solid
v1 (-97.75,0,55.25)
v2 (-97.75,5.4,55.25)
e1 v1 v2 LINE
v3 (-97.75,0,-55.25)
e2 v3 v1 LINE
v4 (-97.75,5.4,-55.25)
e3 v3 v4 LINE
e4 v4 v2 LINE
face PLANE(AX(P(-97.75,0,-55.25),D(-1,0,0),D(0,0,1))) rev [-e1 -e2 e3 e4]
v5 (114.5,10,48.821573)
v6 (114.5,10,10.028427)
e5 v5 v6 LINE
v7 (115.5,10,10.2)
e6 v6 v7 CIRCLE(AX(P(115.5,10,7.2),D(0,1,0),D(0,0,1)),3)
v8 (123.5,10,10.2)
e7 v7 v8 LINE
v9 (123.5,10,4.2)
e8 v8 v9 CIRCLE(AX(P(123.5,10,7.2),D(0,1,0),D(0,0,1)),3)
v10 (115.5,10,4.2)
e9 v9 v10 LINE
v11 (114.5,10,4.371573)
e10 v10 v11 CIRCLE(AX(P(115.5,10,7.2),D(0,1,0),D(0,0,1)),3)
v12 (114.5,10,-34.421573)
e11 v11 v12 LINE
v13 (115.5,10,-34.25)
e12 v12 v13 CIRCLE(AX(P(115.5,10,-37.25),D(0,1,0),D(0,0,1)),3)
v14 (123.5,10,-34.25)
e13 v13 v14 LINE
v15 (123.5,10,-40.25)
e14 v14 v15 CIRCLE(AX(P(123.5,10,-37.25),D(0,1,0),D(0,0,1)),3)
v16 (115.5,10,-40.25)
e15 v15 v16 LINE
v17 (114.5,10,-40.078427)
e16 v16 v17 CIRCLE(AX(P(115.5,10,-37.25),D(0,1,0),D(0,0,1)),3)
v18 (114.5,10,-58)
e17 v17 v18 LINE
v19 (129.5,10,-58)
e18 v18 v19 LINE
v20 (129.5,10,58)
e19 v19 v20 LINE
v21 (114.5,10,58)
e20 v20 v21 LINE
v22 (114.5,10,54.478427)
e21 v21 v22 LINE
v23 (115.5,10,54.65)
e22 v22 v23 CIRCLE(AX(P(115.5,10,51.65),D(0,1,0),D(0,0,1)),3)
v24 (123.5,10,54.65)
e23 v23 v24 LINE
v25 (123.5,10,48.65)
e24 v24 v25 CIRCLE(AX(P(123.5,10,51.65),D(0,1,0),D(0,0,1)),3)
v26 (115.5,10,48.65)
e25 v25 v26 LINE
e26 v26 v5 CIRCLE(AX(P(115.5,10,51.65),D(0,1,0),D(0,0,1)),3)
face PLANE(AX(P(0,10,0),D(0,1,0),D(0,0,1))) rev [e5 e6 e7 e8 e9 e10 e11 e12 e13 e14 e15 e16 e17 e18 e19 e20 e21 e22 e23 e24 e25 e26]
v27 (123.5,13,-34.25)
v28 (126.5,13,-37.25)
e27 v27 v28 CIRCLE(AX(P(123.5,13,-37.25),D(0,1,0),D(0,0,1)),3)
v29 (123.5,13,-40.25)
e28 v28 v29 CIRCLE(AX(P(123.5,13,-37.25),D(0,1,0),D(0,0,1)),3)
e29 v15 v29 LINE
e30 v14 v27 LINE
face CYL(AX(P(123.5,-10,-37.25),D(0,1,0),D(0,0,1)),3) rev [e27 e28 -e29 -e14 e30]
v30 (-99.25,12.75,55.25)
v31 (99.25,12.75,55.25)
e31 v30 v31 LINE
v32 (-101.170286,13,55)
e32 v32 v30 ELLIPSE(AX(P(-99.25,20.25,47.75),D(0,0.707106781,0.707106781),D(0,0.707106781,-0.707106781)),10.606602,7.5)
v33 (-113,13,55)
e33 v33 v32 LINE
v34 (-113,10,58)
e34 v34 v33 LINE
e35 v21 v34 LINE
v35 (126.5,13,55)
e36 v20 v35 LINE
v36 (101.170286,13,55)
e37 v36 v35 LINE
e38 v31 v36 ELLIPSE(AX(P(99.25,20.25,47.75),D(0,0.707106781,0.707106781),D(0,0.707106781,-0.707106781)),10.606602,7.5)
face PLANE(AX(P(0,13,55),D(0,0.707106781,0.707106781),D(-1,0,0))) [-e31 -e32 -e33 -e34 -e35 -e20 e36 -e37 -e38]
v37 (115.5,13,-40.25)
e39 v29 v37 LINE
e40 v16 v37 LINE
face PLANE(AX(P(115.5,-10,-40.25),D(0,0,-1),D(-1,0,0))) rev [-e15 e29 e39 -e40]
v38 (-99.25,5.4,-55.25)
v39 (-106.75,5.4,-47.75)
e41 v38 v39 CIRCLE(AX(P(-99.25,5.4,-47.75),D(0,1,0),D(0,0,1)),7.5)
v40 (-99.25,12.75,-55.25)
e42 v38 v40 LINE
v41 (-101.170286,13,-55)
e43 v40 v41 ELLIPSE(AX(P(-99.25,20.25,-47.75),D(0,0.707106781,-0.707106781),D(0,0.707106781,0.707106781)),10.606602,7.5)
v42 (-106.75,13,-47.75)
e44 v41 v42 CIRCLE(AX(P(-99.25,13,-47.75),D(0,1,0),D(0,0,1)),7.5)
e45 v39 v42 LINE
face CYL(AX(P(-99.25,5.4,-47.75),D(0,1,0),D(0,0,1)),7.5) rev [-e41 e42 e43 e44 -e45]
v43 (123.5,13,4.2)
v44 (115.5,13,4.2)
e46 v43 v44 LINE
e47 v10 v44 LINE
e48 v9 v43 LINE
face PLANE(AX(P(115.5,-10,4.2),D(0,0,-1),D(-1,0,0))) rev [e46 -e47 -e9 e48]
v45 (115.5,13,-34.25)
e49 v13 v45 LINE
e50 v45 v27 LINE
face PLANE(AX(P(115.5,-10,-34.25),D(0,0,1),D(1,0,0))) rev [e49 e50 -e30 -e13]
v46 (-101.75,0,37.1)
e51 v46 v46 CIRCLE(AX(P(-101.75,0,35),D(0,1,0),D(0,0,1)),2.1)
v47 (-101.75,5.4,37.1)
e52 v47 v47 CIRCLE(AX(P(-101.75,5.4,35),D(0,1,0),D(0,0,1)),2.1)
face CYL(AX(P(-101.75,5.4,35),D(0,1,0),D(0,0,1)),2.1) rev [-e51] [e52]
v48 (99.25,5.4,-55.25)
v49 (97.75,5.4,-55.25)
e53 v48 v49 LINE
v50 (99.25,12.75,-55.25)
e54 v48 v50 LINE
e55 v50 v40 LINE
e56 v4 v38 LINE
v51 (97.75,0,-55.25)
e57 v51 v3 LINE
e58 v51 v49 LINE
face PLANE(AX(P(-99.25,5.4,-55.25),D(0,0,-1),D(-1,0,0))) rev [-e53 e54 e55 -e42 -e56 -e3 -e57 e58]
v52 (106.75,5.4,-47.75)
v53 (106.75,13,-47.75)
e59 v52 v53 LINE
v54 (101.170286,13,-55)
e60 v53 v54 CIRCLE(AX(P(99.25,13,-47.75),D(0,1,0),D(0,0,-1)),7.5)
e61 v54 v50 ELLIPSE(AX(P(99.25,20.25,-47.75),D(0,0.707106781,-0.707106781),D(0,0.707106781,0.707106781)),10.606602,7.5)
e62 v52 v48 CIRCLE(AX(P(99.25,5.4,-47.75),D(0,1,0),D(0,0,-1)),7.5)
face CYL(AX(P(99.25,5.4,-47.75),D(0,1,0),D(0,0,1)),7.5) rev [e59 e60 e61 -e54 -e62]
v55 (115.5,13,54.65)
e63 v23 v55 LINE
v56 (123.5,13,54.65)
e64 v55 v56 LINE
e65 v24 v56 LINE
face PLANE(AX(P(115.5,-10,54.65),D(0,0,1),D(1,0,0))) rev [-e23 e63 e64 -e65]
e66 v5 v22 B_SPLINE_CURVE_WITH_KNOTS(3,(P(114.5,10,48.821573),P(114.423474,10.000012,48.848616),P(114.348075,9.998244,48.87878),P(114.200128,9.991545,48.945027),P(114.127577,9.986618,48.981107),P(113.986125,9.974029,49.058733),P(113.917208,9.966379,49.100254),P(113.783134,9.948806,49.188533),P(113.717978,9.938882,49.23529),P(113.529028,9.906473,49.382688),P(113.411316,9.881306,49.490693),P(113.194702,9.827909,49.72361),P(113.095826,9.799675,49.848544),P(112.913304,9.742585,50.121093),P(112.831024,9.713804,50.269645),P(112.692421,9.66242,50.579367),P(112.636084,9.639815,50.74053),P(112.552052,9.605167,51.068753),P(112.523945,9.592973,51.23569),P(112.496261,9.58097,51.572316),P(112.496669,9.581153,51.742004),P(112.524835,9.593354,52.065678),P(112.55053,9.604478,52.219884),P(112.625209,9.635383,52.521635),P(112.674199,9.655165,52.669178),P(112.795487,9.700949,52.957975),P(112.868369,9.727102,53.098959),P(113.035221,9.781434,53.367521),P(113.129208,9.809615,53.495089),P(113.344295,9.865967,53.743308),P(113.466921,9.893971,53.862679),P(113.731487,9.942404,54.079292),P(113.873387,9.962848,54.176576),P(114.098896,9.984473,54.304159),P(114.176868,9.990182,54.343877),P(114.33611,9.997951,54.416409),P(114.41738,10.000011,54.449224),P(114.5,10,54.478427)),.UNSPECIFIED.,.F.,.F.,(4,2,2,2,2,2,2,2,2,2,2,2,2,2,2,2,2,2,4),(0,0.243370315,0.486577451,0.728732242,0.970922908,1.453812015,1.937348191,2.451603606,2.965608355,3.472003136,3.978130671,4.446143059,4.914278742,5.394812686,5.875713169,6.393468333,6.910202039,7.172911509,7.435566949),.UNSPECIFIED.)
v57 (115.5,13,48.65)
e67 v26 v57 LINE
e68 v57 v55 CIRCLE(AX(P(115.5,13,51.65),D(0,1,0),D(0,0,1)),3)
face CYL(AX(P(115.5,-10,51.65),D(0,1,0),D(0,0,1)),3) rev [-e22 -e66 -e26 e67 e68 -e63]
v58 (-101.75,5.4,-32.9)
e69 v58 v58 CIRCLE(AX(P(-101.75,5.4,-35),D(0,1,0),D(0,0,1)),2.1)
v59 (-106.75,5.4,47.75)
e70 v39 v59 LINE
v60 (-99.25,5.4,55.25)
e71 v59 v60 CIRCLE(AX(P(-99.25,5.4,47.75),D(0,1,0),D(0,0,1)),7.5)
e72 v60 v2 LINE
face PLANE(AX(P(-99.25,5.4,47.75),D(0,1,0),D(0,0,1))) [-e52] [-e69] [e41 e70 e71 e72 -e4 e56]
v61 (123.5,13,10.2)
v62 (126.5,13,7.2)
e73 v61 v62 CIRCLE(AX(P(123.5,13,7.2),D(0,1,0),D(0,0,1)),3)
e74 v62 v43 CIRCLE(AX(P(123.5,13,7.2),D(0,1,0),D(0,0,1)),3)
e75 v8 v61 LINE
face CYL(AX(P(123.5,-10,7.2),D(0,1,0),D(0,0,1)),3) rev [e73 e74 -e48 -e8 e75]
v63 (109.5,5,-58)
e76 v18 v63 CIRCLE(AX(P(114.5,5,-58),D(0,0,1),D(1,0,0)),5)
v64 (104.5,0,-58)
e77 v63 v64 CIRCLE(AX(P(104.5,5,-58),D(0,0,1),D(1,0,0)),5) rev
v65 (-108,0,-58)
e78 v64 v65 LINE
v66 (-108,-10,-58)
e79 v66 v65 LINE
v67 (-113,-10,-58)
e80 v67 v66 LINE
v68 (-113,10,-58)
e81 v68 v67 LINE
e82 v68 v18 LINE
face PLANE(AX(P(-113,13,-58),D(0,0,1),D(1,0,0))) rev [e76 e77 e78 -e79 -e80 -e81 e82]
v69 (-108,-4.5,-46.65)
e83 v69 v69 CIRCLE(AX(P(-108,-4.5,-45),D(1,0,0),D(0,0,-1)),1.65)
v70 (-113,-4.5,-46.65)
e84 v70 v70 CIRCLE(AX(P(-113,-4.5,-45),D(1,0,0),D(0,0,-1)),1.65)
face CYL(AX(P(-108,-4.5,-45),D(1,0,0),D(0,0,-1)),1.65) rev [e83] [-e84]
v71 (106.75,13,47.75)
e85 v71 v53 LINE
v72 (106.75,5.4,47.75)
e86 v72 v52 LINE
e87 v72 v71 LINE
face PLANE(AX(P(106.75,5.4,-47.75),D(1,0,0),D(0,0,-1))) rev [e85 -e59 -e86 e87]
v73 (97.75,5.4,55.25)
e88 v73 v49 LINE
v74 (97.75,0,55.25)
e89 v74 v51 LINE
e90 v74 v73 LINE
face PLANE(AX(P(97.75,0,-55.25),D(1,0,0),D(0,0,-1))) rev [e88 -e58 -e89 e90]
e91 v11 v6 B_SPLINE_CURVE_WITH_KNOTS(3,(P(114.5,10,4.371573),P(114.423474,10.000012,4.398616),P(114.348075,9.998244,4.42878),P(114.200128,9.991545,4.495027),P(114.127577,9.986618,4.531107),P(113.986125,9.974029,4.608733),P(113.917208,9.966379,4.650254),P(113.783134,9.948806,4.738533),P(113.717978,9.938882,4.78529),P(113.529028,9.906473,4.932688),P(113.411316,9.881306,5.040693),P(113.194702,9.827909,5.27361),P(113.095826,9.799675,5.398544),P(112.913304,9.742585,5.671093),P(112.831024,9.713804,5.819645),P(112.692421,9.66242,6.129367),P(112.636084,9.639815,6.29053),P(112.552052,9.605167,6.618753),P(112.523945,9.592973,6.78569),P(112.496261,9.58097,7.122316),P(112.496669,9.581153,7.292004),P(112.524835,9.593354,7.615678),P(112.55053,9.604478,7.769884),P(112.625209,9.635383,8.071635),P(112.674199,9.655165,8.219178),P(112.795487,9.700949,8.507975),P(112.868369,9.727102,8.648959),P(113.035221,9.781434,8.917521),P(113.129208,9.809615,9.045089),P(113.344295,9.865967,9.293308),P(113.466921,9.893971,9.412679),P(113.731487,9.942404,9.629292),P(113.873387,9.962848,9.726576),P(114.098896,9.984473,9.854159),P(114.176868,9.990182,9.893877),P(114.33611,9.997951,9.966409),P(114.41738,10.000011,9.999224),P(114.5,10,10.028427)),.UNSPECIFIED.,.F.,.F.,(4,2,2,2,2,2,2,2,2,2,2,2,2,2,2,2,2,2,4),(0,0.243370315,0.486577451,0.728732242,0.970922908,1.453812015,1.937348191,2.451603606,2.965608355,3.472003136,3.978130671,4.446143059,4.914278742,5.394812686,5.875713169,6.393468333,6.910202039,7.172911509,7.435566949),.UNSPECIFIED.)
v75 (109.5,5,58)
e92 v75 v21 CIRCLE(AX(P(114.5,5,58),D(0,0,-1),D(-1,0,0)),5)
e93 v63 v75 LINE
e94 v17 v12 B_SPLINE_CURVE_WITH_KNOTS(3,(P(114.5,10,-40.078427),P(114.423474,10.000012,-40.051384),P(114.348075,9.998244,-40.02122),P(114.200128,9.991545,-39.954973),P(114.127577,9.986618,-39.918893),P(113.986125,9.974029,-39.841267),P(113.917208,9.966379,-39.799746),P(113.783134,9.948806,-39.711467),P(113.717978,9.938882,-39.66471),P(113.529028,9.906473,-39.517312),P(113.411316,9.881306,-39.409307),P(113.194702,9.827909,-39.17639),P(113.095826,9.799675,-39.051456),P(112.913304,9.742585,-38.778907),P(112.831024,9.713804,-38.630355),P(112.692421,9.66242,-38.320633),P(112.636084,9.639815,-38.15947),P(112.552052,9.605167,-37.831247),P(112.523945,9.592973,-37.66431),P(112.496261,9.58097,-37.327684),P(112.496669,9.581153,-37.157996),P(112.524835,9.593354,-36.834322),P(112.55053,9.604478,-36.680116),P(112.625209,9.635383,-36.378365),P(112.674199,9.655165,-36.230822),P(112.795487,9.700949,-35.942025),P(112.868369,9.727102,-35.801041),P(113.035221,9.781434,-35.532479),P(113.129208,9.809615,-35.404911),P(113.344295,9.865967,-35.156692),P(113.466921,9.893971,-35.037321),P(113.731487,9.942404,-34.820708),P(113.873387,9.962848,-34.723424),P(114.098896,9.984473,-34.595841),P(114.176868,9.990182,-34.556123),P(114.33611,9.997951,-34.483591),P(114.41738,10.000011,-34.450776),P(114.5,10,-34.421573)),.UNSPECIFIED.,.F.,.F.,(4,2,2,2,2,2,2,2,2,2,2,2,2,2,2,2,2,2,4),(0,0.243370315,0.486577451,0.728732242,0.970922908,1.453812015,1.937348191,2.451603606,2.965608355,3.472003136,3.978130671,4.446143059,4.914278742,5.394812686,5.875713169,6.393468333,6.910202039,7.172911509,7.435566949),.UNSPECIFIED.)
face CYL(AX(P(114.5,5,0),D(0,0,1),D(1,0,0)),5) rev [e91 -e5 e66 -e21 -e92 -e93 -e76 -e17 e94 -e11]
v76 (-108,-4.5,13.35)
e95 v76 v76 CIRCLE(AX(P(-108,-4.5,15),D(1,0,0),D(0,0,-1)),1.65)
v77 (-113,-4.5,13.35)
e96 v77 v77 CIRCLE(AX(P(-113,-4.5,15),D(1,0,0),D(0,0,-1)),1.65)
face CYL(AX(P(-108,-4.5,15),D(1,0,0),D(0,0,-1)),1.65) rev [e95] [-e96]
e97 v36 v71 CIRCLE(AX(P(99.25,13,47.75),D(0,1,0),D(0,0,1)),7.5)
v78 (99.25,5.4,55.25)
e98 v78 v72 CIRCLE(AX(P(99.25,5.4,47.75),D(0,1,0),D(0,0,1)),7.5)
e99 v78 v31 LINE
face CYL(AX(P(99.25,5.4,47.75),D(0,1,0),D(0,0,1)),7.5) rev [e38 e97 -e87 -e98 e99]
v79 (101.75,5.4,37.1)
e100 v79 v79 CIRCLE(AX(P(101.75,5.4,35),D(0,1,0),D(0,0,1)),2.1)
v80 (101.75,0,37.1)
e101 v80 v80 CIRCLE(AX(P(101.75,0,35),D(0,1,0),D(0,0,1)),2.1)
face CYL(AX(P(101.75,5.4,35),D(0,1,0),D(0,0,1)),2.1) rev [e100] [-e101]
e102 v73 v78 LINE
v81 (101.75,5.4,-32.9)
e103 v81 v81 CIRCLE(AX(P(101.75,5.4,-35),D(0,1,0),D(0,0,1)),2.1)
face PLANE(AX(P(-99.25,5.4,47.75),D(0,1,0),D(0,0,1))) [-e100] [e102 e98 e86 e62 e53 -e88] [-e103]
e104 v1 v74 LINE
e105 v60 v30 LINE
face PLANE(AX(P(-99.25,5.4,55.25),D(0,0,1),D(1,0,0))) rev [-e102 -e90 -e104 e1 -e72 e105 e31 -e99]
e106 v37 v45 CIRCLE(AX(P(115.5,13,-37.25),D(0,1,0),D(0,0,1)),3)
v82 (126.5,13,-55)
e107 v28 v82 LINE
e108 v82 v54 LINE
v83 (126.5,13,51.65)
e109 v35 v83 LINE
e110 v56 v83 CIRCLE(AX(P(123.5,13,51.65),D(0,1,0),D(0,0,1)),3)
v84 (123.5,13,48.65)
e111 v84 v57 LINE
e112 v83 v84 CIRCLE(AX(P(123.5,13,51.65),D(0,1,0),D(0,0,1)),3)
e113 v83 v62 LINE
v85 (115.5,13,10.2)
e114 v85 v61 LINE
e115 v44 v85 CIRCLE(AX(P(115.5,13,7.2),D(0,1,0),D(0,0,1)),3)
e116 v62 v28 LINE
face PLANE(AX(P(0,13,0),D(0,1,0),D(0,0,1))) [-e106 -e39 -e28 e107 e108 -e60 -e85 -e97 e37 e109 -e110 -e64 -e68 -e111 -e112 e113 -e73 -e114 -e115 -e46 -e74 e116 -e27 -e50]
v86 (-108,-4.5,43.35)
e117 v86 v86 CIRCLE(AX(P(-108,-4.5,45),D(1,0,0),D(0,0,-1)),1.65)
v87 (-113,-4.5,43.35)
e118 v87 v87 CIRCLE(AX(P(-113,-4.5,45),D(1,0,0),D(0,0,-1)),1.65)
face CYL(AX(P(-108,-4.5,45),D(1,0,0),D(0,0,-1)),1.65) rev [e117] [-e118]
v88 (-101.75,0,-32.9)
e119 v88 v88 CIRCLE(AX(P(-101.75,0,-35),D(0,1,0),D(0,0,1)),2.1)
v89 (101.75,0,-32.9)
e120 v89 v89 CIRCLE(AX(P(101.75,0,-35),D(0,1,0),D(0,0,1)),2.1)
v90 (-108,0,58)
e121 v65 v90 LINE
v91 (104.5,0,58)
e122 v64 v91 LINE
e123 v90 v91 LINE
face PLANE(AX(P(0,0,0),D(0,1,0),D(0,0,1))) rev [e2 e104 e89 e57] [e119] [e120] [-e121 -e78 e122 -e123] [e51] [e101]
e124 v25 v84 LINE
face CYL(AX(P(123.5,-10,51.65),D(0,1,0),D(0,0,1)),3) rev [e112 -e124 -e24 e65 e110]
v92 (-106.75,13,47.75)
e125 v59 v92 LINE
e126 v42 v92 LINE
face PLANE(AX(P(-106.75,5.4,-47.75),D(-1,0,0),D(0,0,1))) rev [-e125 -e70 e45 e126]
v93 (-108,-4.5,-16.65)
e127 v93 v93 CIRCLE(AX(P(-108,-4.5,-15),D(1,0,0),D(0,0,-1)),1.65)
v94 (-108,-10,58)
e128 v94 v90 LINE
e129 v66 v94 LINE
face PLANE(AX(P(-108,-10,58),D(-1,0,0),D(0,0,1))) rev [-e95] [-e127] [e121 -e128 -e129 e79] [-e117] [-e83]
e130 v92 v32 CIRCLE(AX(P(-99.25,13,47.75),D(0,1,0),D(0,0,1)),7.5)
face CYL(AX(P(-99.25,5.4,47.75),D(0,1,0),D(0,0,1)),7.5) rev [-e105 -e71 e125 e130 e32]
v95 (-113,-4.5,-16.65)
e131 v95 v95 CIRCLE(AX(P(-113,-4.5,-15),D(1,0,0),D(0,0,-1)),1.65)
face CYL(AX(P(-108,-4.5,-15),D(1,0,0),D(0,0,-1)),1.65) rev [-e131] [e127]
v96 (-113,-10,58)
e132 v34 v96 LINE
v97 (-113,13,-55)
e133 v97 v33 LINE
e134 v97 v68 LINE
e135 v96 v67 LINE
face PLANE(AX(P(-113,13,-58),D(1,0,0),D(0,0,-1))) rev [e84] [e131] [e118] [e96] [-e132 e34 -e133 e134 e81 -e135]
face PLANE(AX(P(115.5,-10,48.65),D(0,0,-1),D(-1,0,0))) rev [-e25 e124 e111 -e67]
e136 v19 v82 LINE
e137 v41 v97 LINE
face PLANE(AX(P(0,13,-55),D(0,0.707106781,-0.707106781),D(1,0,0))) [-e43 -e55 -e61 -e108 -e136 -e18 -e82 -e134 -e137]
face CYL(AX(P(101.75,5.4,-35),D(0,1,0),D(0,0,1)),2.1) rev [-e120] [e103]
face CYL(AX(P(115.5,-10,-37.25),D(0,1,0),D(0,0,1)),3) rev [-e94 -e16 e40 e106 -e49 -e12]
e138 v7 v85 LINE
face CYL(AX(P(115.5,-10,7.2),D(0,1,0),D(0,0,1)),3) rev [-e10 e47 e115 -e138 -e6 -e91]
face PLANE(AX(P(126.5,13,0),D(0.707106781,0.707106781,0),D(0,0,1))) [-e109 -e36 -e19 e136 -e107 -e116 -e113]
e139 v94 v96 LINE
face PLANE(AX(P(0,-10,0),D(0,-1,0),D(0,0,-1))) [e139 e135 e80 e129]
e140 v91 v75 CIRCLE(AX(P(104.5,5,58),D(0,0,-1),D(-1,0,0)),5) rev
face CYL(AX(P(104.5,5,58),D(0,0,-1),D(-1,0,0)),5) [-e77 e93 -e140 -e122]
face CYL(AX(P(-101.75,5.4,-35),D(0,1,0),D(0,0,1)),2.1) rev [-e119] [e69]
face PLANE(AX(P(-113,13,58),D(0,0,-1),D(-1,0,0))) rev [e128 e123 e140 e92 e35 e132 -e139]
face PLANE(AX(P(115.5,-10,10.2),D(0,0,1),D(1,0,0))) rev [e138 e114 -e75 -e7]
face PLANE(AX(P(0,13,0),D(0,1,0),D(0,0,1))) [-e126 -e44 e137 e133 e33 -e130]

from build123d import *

# Parameters (mm, degrees)
SKETCH1_W                        = 242.5
SKETCH1_H                        = 116
BOSS_EXTRUDE1_DEPTH              = 13
CUT_EXTRUDE1_DEPTH               = 7.6
F_1_8_27_NPSM_TAPPED_HOLE1_D     = 5
F_1_8_27_NPSM_TAPPED_HOLE1_DEPTH = 22.99
F_1_8_27_NPSM_TAPPED_HOLE1_TIP   = 1.502151548
SKETCH6_W                        = 195.5
SKETCH6_H                        = 110.5
CUT_EXTRUDE2_DEPTH               = 143.098592533
SKETCH32_W                       = 20
SKETCH32_H                       = 116
CUT_EXTRUDE10_DEPTH              = 10
FILLET1_START                    = -59
FILLET1_DEPTH                    = 118
FILLET1_START_2                  = -58
FILLET1_2_DEPTH                  = 116
CHAMFER1_SIZE                    = 3
SKETCH36_W                       = 5
SKETCH36_H                       = 116
BOSS_EXTRUDE2_DEPTH              = 10
M5X0_8_TAPPED_HOLE1_D            = 4.2
M5X0_8_TAPPED_HOLE1_DEPTH        = 12.4
M5X0_8_TAPPED_HOLE1_TIP          = 1.2618073
M4X0_7_TAPPED_HOLE1_D            = 3.3
CUT_EXTRUDE11_DEPTH              = 144.747173885


with BuildPart() as part:
    # Sketch1 → Boss-Extrude1 (new body)
    with BuildSketch(Plane(origin=(0, 0, 0), x_dir=(1, 0, 0), z_dir=(0, 1, 0))):
        with Locations((8.25, 0)):
            Rectangle(SKETCH1_W, SKETCH1_H)
    extrude(amount=BOSS_EXTRUDE1_DEPTH)

    # Sketch2 → Cut-Extrude1 (cut)
    with BuildSketch(Plane(origin=(0, 13, 0), x_dir=(1, 0, 0), z_dir=(0, 1, 0))):
        with BuildLine():
            Line((-99.25, 55.25), (99.25, 55.25))
            ThreePointArc((99.25, 55.25), (104.553300859, 53.053300859), (106.75, 47.75))
            Line((106.75, 47.75), (106.75, -47.75))
            ThreePointArc((106.75, -47.75), (104.553300859, -53.053300859), (99.25, -55.25))
            Line((99.25, -55.25), (-99.25, -55.25))
            ThreePointArc((-99.25, -55.25), (-104.553300859, -53.053300859), (-106.75, -47.75))
            Line((-106.75, -47.75), (-106.75, 47.75))
            ThreePointArc((-106.75, 47.75), (-104.553300859, 53.053300859), (-99.25, 55.25))
        make_face()
    extrude(amount=-CUT_EXTRUDE1_DEPTH, mode=Mode.SUBTRACT)

    # 1/8-27 NPSM Tapped Hole1
    with Locations(Plane(origin=(0, 5.4, 0), x_dir=(1, 0, 0), z_dir=(0, 1, 0))):
        with Locations((-74.86, 30.93), (51.34, 30.93), (51.34, -34.72), (-74.86, -34.72)):
            Hole(F_1_8_27_NPSM_TAPPED_HOLE1_D / 2, depth=F_1_8_27_NPSM_TAPPED_HOLE1_DEPTH)
            with Locations((0, 0, -(F_1_8_27_NPSM_TAPPED_HOLE1_DEPTH + F_1_8_27_NPSM_TAPPED_HOLE1_TIP / 2))):  # 118° drill point
                Cone(0, F_1_8_27_NPSM_TAPPED_HOLE1_D / 2, F_1_8_27_NPSM_TAPPED_HOLE1_TIP, mode=Mode.SUBTRACT)

    # Sketch6 → Cut-Extrude2 (cut, through all)
    with BuildSketch(Plane(origin=(0, 5.4, 0), x_dir=(1, 0, 0), z_dir=(0, 1, 0))):
        Rectangle(SKETCH6_W, SKETCH6_H)
    extrude(amount=-CUT_EXTRUDE2_DEPTH, mode=Mode.SUBTRACT)

    # Sketch32 → Cut-Extrude10 (cut)
    with BuildSketch(Plane.XZ):
        with Locations((119.5, 0)):
            Rectangle(SKETCH32_W, SKETCH32_H)
    extrude(amount=-CUT_EXTRUDE10_DEPTH, mode=Mode.SUBTRACT)

    # Fillet1: read off the stored shape, not the designer's step
    # Fillet1 outline → Fillet1 (cut)
    with BuildSketch(Plane.XY.offset(FILLET1_START)):
        with BuildLine():
            Line((109.5, 0), (109.5, 5))
            ThreePointArc((109.5, 5), (108.035533906, 1.464466094), (104.5, 0))
            Line((104.5, 0), (109.5, 0))
        make_face()
    extrude(amount=FILLET1_DEPTH, mode=Mode.SUBTRACT)

    # Fillet1 2 outline → Fillet1 2 (add)
    with BuildSketch(Plane.XY.offset(FILLET1_START_2)):
        with BuildLine():
            ThreePointArc((109.5, 5), (110.964466094, 8.535533906), (114.5, 10))
            Line((114.5, 10), (109.5, 10))
            Line((109.5, 10), (109.5, 5))
        make_face()
    extrude(amount=FILLET1_2_DEPTH)

    # Chamfer1
    # the kernel refuses this chamfer: 3 mm, written as the material it takes off along each edge
    with BuildSketch(Plane(origin=(137.215048964, 13, 58), x_dir=(0, 0, -1), z_dir=(-1, 0, 0))) as chamfer1_piece_1:
        Polygon((CHAMFER1_SIZE, 0), (0, CHAMFER1_SIZE), (0, 0), align=None)
    extrude(amount=257.930097928, mode=Mode.SUBTRACT)
    with BuildSketch(Plane(origin=(129.5, 13, -65.715048964), x_dir=(0, -1, 0), z_dir=(0, 0, 1))) as chamfer1_piece_2:
        Polygon((CHAMFER1_SIZE, 0), (0, -CHAMFER1_SIZE), (0, 0), align=None)
    extrude(amount=131.430097928, mode=Mode.SUBTRACT)
    with BuildSketch(Plane(origin=(-120.715048964, 13, -58), x_dir=(0, -1, 0), z_dir=(1, 0, 0))) as chamfer1_piece_3:
        Polygon((CHAMFER1_SIZE, 0), (0, -CHAMFER1_SIZE), (0, 0), align=None)
    extrude(amount=257.930097928, mode=Mode.SUBTRACT)

    # Sketch36 → Boss-Extrude2 (add)
    with BuildSketch(Plane.XZ):
        with Locations((-110.5, 0)):
            Rectangle(SKETCH36_W, SKETCH36_H)
    extrude(amount=BOSS_EXTRUDE2_DEPTH)

    # M5x0.8 Tapped Hole1
    with Locations(Plane(origin=(0, 5.4, 0), x_dir=(1, 0, 0), z_dir=(0, 1, 0))):
        with Locations((-101.75, 35), (-101.75, -35), (101.75, 35), (101.75, -35)):
            Hole(M5X0_8_TAPPED_HOLE1_D / 2, depth=M5X0_8_TAPPED_HOLE1_DEPTH)
            with Locations((0, 0, -(M5X0_8_TAPPED_HOLE1_DEPTH + M5X0_8_TAPPED_HOLE1_TIP / 2))):  # 118° drill point
                Cone(0, M5X0_8_TAPPED_HOLE1_D / 2, M5X0_8_TAPPED_HOLE1_TIP, mode=Mode.SUBTRACT)

    # M4x0.7 Tapped Hole1 (through all)
    with Locations(Plane(origin=(-108, 0, 0), x_dir=(0, 0, -1), z_dir=(1, 0, 0))):
        with Locations((-15, -4.5), (15, -4.5), (45, -4.5), (-45, -4.5)):
            Hole(M4X0_7_TAPPED_HOLE1_D / 2)

    # Sketch43 → Cut-Extrude11 (cut, through all)
    with BuildSketch(Plane(origin=(0, 13, 0), x_dir=(1, 0, 0), z_dir=(0, 1, 0))):
        with BuildLine():
            Line((115.5, -48.65), (123.5, -48.65))
            ThreePointArc((123.5, -48.65), (126.5, -51.65), (123.5, -54.65))
            Line((123.5, -54.65), (115.5, -54.65))
            ThreePointArc((115.5, -54.65), (112.5, -51.65), (115.5, -48.65))
        make_face()
        with BuildLine():
            Line((115.5, -4.2), (123.5, -4.2))
            ThreePointArc((123.5, -4.2), (126.5, -7.2), (123.5, -10.2))
            Line((123.5, -10.2), (115.5, -10.2))
            ThreePointArc((115.5, -10.2), (112.5, -7.2), (115.5, -4.2))
        make_face()
        with BuildLine():
            Line((115.5, 40.25), (123.5, 40.25))
            ThreePointArc((123.5, 40.25), (126.5, 37.25), (123.5, 34.25))
            Line((123.5, 34.25), (115.5, 34.25))
            ThreePointArc((115.5, 34.25), (112.5, 37.25), (115.5, 40.25))
        make_face()
    extrude(amount=-CUT_EXTRUDE11_DEPTH, mode=Mode.SUBTRACT)


solid = part.part
